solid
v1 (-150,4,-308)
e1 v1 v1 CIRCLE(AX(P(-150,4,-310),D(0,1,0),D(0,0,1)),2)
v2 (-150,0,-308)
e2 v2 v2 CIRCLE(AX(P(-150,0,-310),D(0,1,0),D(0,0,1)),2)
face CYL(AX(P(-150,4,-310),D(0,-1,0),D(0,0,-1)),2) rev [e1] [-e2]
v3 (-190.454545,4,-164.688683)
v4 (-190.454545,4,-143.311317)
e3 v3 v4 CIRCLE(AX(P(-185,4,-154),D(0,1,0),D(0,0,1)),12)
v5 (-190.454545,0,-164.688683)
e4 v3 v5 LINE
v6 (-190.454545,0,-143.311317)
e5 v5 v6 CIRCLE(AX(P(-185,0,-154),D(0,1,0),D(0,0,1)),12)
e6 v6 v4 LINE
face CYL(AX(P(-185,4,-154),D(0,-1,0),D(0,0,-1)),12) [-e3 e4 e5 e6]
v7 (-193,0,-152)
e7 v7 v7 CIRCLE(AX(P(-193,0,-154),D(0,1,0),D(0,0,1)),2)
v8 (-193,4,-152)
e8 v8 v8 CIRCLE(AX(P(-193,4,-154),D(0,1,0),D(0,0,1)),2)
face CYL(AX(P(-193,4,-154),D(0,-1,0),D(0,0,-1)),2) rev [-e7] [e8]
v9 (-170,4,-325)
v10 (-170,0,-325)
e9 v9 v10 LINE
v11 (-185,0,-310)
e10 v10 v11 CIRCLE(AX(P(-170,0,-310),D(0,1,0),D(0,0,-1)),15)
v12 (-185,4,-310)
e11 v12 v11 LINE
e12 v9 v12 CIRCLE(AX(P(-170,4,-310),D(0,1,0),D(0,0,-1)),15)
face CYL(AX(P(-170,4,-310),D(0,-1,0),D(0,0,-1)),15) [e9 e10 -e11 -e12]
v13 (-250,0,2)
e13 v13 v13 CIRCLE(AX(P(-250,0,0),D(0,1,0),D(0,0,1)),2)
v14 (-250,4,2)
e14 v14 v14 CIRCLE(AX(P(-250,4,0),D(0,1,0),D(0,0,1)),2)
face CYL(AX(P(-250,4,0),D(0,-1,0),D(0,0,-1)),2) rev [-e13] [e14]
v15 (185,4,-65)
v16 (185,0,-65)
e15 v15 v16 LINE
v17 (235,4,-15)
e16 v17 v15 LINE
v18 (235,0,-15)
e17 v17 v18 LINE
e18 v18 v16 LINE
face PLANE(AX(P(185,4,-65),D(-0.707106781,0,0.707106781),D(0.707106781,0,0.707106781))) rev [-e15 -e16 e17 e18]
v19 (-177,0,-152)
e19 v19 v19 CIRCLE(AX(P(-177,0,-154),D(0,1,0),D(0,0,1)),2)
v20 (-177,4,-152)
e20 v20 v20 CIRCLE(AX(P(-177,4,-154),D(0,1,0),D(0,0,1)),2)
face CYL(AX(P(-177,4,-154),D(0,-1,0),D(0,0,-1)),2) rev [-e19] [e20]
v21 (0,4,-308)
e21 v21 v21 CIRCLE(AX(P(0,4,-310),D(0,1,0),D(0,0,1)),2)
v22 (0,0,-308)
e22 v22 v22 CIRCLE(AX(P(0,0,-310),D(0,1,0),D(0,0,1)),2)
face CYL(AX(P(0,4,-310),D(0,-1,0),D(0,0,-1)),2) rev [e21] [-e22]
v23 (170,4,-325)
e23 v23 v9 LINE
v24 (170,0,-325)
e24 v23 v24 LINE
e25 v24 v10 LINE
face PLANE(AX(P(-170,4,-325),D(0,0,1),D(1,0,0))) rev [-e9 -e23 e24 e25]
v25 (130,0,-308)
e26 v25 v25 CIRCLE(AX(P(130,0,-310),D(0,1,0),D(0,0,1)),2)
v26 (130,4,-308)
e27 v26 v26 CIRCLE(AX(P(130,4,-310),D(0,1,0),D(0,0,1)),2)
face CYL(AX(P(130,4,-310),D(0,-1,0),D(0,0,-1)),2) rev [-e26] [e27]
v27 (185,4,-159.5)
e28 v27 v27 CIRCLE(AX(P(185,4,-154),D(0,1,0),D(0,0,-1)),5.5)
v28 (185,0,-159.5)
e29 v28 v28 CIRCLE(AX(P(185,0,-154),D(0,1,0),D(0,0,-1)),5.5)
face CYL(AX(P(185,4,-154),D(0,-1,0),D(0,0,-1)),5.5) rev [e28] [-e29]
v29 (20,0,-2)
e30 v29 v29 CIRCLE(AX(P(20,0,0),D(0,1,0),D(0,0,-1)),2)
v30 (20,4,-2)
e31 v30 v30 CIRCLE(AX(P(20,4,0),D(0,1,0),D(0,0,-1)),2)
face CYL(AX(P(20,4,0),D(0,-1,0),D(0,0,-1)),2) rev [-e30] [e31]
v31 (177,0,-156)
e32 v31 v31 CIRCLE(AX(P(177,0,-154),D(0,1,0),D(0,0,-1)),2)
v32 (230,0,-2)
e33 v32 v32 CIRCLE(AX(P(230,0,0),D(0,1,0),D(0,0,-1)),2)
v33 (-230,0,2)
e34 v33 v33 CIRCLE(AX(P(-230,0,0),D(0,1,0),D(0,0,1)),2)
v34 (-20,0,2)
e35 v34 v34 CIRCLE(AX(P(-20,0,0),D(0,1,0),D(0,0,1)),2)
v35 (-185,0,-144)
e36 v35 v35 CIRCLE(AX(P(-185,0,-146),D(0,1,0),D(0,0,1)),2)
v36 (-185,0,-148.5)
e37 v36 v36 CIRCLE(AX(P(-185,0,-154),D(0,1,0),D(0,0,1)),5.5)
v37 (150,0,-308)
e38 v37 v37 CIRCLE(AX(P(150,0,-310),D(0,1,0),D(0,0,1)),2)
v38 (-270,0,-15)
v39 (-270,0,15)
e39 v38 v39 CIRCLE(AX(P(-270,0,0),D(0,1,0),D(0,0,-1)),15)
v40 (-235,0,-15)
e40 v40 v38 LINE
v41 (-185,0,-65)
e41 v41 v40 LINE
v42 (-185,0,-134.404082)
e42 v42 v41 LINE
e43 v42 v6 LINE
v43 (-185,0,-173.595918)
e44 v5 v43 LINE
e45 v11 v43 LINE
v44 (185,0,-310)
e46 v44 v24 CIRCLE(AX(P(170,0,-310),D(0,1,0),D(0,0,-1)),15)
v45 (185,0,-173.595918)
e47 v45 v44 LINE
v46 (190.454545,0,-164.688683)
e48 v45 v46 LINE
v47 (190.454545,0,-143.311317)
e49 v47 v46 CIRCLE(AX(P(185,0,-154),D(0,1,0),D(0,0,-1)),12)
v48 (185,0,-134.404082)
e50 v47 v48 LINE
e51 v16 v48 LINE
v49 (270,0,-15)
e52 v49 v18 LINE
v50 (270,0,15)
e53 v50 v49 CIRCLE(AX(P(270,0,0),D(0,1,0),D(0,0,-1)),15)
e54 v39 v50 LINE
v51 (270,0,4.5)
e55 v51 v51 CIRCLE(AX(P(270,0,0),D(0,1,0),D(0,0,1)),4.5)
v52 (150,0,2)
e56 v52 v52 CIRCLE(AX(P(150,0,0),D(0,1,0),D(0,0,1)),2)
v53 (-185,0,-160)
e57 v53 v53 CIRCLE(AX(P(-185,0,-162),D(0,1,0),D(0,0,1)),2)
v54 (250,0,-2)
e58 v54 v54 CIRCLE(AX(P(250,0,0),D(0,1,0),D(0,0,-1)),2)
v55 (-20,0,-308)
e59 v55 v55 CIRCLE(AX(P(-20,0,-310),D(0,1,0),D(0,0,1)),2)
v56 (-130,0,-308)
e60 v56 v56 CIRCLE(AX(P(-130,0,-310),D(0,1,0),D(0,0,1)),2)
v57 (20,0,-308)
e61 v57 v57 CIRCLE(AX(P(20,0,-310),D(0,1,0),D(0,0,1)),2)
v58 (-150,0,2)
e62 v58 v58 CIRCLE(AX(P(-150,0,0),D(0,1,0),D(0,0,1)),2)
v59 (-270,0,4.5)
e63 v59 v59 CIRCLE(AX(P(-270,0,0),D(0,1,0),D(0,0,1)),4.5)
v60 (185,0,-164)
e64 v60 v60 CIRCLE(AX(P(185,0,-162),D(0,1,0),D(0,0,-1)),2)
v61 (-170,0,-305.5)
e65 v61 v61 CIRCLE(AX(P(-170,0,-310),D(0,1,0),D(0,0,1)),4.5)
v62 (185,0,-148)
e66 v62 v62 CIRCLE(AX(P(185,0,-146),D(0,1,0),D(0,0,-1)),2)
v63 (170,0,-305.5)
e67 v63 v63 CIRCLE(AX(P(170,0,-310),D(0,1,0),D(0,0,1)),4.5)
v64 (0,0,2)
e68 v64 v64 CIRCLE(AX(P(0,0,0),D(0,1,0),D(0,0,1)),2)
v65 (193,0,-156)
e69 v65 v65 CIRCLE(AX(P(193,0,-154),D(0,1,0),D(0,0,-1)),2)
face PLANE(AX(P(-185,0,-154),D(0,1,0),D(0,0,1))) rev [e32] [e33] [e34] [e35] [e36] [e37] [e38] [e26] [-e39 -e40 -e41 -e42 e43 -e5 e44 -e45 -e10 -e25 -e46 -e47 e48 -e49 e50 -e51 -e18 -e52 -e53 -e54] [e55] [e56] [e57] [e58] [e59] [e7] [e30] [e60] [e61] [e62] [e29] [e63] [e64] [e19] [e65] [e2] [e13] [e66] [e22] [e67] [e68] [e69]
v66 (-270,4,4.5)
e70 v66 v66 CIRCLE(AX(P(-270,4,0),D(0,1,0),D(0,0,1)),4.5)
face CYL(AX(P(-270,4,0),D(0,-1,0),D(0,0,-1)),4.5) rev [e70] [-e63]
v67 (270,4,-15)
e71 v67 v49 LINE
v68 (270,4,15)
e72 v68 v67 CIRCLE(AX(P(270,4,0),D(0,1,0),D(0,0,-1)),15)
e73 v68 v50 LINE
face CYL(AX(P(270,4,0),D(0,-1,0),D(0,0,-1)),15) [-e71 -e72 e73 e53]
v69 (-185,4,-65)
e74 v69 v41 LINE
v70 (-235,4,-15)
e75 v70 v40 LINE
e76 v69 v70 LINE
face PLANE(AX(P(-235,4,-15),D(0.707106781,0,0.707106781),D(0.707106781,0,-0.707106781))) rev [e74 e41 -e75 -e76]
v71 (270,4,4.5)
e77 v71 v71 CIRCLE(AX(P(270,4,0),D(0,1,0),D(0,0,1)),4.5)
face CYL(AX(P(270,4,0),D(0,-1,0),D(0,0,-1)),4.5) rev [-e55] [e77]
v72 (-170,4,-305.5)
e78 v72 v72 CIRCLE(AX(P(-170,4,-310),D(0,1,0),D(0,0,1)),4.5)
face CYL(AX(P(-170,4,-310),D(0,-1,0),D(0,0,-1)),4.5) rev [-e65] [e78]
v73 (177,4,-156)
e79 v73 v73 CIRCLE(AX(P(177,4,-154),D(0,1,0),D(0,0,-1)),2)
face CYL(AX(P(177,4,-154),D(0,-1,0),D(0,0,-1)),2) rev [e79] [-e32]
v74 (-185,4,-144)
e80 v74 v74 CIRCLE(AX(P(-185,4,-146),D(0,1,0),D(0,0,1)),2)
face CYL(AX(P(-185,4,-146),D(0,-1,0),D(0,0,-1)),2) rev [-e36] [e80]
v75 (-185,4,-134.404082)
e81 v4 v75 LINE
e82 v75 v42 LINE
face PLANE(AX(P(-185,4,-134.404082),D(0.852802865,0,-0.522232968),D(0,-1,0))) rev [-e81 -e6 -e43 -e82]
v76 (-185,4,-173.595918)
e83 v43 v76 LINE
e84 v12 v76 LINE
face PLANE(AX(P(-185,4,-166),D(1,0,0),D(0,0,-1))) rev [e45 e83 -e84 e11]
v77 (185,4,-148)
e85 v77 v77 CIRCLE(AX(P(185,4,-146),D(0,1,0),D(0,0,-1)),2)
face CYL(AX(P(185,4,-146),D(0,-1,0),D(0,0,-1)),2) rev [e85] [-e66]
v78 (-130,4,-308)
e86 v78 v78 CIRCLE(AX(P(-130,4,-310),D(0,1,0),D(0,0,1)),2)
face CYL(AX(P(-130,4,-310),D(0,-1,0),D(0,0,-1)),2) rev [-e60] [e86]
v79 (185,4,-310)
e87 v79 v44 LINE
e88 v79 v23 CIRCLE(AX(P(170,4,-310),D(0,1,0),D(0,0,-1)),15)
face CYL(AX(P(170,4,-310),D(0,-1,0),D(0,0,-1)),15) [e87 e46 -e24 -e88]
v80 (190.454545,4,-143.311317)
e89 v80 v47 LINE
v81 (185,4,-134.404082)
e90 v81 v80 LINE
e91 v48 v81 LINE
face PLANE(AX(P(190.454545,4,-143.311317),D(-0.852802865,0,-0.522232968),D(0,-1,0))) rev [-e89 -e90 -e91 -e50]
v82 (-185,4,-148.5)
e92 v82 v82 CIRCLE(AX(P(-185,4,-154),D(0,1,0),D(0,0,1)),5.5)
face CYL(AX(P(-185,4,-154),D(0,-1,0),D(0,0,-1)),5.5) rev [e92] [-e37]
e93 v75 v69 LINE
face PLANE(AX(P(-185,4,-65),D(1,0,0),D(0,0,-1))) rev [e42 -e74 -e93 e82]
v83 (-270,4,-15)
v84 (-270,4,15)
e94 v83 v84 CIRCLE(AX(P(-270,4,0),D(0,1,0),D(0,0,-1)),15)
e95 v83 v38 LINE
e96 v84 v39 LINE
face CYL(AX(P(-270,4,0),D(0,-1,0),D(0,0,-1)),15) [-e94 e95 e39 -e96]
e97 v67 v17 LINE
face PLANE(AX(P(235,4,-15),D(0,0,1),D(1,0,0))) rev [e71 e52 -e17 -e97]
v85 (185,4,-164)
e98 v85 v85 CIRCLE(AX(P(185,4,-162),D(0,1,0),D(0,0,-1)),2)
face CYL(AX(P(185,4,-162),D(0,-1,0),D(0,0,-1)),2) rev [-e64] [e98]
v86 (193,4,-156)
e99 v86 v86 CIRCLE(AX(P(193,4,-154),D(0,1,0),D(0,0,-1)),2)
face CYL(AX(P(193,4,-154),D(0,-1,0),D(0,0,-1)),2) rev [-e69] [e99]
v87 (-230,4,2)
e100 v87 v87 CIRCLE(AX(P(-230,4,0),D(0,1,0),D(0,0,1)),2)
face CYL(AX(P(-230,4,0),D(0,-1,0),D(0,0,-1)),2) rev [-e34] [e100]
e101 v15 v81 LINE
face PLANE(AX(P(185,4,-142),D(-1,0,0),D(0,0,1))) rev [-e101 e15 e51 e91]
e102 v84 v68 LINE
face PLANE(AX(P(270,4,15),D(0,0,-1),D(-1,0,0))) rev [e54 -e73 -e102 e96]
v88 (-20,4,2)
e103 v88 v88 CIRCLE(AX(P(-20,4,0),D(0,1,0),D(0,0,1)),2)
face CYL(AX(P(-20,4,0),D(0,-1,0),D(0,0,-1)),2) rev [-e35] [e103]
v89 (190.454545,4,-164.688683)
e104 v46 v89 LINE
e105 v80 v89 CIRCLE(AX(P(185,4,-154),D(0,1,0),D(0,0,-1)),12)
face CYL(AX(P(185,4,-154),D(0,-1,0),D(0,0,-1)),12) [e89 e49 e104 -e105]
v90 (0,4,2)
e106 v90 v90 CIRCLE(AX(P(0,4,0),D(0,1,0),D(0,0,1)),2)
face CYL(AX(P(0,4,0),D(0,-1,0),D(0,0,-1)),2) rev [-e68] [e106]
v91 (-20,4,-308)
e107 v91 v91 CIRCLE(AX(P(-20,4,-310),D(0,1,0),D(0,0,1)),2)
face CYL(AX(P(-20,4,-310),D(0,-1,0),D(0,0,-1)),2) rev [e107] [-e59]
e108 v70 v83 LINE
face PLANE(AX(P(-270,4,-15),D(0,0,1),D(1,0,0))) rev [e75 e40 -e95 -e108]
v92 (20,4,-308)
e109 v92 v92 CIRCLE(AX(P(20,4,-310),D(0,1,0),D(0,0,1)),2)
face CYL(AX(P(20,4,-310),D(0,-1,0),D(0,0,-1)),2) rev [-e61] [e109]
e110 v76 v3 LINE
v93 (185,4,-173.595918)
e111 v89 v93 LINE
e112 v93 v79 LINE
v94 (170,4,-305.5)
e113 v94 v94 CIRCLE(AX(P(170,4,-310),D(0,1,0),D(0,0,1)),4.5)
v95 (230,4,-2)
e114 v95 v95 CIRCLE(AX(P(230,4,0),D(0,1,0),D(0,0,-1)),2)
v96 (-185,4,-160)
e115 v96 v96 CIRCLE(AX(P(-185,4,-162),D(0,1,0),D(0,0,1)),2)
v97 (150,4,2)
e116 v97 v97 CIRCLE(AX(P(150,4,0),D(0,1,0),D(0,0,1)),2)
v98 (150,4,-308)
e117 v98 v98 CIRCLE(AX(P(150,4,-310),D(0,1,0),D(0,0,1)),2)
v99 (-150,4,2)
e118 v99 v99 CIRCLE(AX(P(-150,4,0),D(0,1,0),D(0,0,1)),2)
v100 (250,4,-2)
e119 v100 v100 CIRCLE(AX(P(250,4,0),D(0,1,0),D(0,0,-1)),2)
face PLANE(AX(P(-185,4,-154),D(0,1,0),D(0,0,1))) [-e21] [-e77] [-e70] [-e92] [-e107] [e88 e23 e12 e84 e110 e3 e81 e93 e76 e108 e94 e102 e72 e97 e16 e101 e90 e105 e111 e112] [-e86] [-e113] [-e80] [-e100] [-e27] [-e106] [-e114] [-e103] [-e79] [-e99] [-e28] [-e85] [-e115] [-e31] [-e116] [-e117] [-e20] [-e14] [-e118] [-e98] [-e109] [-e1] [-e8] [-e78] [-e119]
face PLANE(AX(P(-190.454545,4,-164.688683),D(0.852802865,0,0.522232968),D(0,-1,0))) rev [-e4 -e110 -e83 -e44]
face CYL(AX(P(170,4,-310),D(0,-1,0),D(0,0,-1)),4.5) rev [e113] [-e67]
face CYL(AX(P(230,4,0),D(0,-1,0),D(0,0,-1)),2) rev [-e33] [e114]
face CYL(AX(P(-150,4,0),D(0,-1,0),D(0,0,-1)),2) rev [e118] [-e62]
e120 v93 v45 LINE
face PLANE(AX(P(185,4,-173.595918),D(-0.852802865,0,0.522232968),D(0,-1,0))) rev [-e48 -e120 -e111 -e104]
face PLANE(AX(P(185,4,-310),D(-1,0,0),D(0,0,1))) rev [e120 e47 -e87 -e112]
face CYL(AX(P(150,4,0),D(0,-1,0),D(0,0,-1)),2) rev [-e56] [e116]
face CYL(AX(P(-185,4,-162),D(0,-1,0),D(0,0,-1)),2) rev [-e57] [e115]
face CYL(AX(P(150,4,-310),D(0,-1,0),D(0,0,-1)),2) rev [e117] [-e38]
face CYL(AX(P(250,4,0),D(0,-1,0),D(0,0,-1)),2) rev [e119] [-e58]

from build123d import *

# Parameters (mm, degrees)
SKETCH1_R           = 4.5
SKETCH1_R_2         = 2
SKETCH1_R_3         = 5.5
BOSS_EXTRUDE1_DEPTH = 4


with BuildPart() as part:
    # Sketch1 → Boss-Extrude1 (new body)
    with BuildSketch(Plane(origin=(0, 0, 0), x_dir=(1, 0, 0), z_dir=(0, 1, 0))):
        with BuildLine():
            Line((-270, 15), (-235, 15))
            Line((-235, 15), (-185, 65))
            Line((-185, 65), (-185, 142))
            ThreePointArc((-185, 142), (-197, 154), (-185, 166))
            Line((-185, 166), (-185, 310))
            ThreePointArc((-185, 310), (-180.606601718, 320.606601718), (-170, 325))
            Line((-170, 325), (170, 325))
            ThreePointArc((170, 325), (180.606601718, 320.606601718), (185, 310))
            Line((185, 310), (185, 166))
            ThreePointArc((185, 166), (197, 154), (185, 142))
            Line((185, 142), (185, 65))
            Line((185, 65), (235, 15))
            Line((235, 15), (270, 15))
            ThreePointArc((270, 15), (285, 0), (270, -15))
            Line((270, -15), (-270, -15))
            ThreePointArc((-270, -15), (-285, 0), (-270, 15))
        make_face()
        with Locations(Location((-170, 310, 0), (0, 0, 270))):
            Circle(SKETCH1_R, mode=Mode.SUBTRACT)
        with Locations(Location((170, 310, 0), (0, 0, 270))):
            Circle(SKETCH1_R, mode=Mode.SUBTRACT)
        with Locations(Location((-270, 0, 0), (0, 0, 270))):
            Circle(SKETCH1_R, mode=Mode.SUBTRACT)
        with Locations(Location((270, 0, 0), (0, 0, 270))):
            Circle(SKETCH1_R, mode=Mode.SUBTRACT)
        with Locations(Location((0, 310, 0), (0, 0, 270))):
            Circle(SKETCH1_R_2, mode=Mode.SUBTRACT)
        with Locations(Location((-150, 310, 0), (0, 0, 270))):
            Circle(SKETCH1_R_2, mode=Mode.SUBTRACT)
        with Locations(Location((150, 310, 0), (0, 0, 270))):
            Circle(SKETCH1_R_2, mode=Mode.SUBTRACT)
        with Locations(Location((0, 0, 0), (0, 0, 270))):
            Circle(SKETCH1_R_2, mode=Mode.SUBTRACT)
        with Locations(Location((-150, 0, 0), (0, 0, 270))):
            Circle(SKETCH1_R_2, mode=Mode.SUBTRACT)
        with Locations(Location((150, 0, 0), (0, 0, 270))):
            Circle(SKETCH1_R_2, mode=Mode.SUBTRACT)
        with Locations(Location((-185, 154, 0), (0, 0, 270))):
            Circle(SKETCH1_R_3, mode=Mode.SUBTRACT)
        with Locations(Location((-185, 162, 0), (0, 0, 270))):
            Circle(SKETCH1_R_2, mode=Mode.SUBTRACT)
        with Locations(Location((-177, 154, 0), (0, 0, 270))):
            Circle(SKETCH1_R_2, mode=Mode.SUBTRACT)
        with Locations(Location((-185, 146, 0), (0, 0, 270))):
            Circle(SKETCH1_R_2, mode=Mode.SUBTRACT)
        with Locations(Location((-193, 154, 0), (0, 0, 270))):
            Circle(SKETCH1_R_2, mode=Mode.SUBTRACT)
        with Locations(Location((185, 162, 0), (0, 0, 90))):
            Circle(SKETCH1_R_2, mode=Mode.SUBTRACT)
        with Locations(Location((177, 154, 0), (0, 0, 90))):
            Circle(SKETCH1_R_2, mode=Mode.SUBTRACT)
        with Locations(Location((185, 146, 0), (0, 0, 90))):
            Circle(SKETCH1_R_2, mode=Mode.SUBTRACT)
        with Locations(Location((193, 154, 0), (0, 0, 90))):
            Circle(SKETCH1_R_2, mode=Mode.SUBTRACT)
        with Locations(Location((185, 154, 0), (0, 0, 90))):
            Circle(SKETCH1_R_3, mode=Mode.SUBTRACT)
        with Locations(Location((-130, 310, 0), (0, 0, 270))):
            Circle(SKETCH1_R_2, mode=Mode.SUBTRACT)
        with Locations(Location((130, 310, 0), (0, 0, 270))):
            Circle(SKETCH1_R_2, mode=Mode.SUBTRACT)
        with Locations(Location((-20, 310, 0), (0, 0, 270))):
            Circle(SKETCH1_R_2, mode=Mode.SUBTRACT)
        with Locations(Location((20, 310, 0), (0, 0, 270))):
            Circle(SKETCH1_R_2, mode=Mode.SUBTRACT)
        with Locations(Location((-250, 0, 0), (0, 0, 270))):
            Circle(SKETCH1_R_2, mode=Mode.SUBTRACT)
        with Locations(Location((-230, 0, 0), (0, 0, 270))):
            Circle(SKETCH1_R_2, mode=Mode.SUBTRACT)
        with Locations(Location((-20, 0, 0), (0, 0, 270))):
            Circle(SKETCH1_R_2, mode=Mode.SUBTRACT)
        with Locations(Location((20, 0, 0), (0, 0, 90))):
            Circle(SKETCH1_R_2, mode=Mode.SUBTRACT)
        with Locations(Location((230, 0, 0), (0, 0, 90))):
            Circle(SKETCH1_R_2, mode=Mode.SUBTRACT)
        with Locations(Location((250, 0, 0), (0, 0, 90))):
            Circle(SKETCH1_R_2, mode=Mode.SUBTRACT)
    extrude(amount=BOSS_EXTRUDE1_DEPTH)

    # Chamfer1
    # the kernel refuses this chamfer: 10 mm, written as the material it adds along each edge
    with BuildSketch(Plane(origin=(-185, 0, -142), x_dir=(0.026309669702560337, 0, 0.99965384072695), z_dir=(0, 1, 0))) as chamfer1_piece_1:
        with BuildLine():
            Line((7.93978752, 0), (-1.800869825, -5.618003075))
            Line((-1.800869825, -5.618003075), (-1.976561079, -5.522438525))
            ThreePointArc((-1.976561079, -5.522438525), (-0.637668429, -2.883002495), (-0.199930768, 0.005261934))
            Line((-0.199930768, 0.005261934), (0.005261934, 0.199930768))
            ThreePointArc((0.005261934, 0.199930768), (3.972407738, 0.09552033), (7.945049453, 0.199930768))
            Line((7.945049453, 0.199930768), (7.93978752, 0))
        make_face()
    extrude(amount=4)
    with BuildSketch(Plane(origin=(-185, 0, -166), x_dir=(-0.9599725502617332, 0, 0.2800940962319344), z_dir=(0, 1, 0))) as chamfer1_piece_2:
        with BuildLine():
            Line((5.899583941, 0), (-2.423649516, -7.560829907))
            Line((-2.423649516, -7.560829907), (-2.615644026, -7.504811088))
            ThreePointArc((-2.615644026, -7.504811088), (-1.303553405, -3.753651008), (-0.19199451, 0.056018819))
            Line((-0.19199451, 0.056018819), (0.056018819, 0.19199451))
            ThreePointArc((0.056018819, 0.19199451), (2.9400505, -0.272813985), (5.862210991, 0.19647713))
            Line((5.862210991, 0.19647713), (5.899583941, 0))
        make_face()
    extrude(amount=4)

    # Chamfer2
    # the kernel refuses this chamfer: 10 mm, written as the material it adds along each edge
    with BuildSketch(Plane(origin=(185, 0, -166), x_dir=(0.9599725502617332, 0, 0.2800940962319344), z_dir=(0, 1, 0))) as chamfer2_piece_1:
        with BuildLine():
            Line((5.899583941, 0), (-2.423649516, 7.560829907))
            Line((-2.423649516, 7.560829907), (-2.615644026, 7.504811088))
            ThreePointArc((-2.615644026, 7.504811088), (-1.303553405, 3.753651008), (-0.19199451, -0.056018819))
            Line((-0.19199451, -0.056018819), (0.056018819, -0.19199451))
            ThreePointArc((0.056018819, -0.19199451), (2.9400505, 0.272813985), (5.862210991, -0.19647713))
            Line((5.862210991, -0.19647713), (5.899583941, 0))
        make_face()
    extrude(amount=4)
    with BuildSketch(Plane(origin=(185, 0, -142), x_dir=(-0.026309669702560337, 0, 0.99965384072695), z_dir=(0, 1, 0))) as chamfer2_piece_2:
        with BuildLine():
            Line((7.93978752, 0), (-1.800869825, 5.618003075))
            Line((-1.800869825, 5.618003075), (-1.976561079, 5.522438525))
            ThreePointArc((-1.976561079, 5.522438525), (-0.637668429, 2.883002495), (-0.199930768, -0.005261934))
            Line((-0.199930768, -0.005261934), (0.005261934, -0.199930768))
            ThreePointArc((0.005261934, -0.199930768), (3.972407738, -0.09552033), (7.945049453, -0.199930768))
            Line((7.945049453, -0.199930768), (7.93978752, 0))
        make_face()
    extrude(amount=4)


solid = part.part
